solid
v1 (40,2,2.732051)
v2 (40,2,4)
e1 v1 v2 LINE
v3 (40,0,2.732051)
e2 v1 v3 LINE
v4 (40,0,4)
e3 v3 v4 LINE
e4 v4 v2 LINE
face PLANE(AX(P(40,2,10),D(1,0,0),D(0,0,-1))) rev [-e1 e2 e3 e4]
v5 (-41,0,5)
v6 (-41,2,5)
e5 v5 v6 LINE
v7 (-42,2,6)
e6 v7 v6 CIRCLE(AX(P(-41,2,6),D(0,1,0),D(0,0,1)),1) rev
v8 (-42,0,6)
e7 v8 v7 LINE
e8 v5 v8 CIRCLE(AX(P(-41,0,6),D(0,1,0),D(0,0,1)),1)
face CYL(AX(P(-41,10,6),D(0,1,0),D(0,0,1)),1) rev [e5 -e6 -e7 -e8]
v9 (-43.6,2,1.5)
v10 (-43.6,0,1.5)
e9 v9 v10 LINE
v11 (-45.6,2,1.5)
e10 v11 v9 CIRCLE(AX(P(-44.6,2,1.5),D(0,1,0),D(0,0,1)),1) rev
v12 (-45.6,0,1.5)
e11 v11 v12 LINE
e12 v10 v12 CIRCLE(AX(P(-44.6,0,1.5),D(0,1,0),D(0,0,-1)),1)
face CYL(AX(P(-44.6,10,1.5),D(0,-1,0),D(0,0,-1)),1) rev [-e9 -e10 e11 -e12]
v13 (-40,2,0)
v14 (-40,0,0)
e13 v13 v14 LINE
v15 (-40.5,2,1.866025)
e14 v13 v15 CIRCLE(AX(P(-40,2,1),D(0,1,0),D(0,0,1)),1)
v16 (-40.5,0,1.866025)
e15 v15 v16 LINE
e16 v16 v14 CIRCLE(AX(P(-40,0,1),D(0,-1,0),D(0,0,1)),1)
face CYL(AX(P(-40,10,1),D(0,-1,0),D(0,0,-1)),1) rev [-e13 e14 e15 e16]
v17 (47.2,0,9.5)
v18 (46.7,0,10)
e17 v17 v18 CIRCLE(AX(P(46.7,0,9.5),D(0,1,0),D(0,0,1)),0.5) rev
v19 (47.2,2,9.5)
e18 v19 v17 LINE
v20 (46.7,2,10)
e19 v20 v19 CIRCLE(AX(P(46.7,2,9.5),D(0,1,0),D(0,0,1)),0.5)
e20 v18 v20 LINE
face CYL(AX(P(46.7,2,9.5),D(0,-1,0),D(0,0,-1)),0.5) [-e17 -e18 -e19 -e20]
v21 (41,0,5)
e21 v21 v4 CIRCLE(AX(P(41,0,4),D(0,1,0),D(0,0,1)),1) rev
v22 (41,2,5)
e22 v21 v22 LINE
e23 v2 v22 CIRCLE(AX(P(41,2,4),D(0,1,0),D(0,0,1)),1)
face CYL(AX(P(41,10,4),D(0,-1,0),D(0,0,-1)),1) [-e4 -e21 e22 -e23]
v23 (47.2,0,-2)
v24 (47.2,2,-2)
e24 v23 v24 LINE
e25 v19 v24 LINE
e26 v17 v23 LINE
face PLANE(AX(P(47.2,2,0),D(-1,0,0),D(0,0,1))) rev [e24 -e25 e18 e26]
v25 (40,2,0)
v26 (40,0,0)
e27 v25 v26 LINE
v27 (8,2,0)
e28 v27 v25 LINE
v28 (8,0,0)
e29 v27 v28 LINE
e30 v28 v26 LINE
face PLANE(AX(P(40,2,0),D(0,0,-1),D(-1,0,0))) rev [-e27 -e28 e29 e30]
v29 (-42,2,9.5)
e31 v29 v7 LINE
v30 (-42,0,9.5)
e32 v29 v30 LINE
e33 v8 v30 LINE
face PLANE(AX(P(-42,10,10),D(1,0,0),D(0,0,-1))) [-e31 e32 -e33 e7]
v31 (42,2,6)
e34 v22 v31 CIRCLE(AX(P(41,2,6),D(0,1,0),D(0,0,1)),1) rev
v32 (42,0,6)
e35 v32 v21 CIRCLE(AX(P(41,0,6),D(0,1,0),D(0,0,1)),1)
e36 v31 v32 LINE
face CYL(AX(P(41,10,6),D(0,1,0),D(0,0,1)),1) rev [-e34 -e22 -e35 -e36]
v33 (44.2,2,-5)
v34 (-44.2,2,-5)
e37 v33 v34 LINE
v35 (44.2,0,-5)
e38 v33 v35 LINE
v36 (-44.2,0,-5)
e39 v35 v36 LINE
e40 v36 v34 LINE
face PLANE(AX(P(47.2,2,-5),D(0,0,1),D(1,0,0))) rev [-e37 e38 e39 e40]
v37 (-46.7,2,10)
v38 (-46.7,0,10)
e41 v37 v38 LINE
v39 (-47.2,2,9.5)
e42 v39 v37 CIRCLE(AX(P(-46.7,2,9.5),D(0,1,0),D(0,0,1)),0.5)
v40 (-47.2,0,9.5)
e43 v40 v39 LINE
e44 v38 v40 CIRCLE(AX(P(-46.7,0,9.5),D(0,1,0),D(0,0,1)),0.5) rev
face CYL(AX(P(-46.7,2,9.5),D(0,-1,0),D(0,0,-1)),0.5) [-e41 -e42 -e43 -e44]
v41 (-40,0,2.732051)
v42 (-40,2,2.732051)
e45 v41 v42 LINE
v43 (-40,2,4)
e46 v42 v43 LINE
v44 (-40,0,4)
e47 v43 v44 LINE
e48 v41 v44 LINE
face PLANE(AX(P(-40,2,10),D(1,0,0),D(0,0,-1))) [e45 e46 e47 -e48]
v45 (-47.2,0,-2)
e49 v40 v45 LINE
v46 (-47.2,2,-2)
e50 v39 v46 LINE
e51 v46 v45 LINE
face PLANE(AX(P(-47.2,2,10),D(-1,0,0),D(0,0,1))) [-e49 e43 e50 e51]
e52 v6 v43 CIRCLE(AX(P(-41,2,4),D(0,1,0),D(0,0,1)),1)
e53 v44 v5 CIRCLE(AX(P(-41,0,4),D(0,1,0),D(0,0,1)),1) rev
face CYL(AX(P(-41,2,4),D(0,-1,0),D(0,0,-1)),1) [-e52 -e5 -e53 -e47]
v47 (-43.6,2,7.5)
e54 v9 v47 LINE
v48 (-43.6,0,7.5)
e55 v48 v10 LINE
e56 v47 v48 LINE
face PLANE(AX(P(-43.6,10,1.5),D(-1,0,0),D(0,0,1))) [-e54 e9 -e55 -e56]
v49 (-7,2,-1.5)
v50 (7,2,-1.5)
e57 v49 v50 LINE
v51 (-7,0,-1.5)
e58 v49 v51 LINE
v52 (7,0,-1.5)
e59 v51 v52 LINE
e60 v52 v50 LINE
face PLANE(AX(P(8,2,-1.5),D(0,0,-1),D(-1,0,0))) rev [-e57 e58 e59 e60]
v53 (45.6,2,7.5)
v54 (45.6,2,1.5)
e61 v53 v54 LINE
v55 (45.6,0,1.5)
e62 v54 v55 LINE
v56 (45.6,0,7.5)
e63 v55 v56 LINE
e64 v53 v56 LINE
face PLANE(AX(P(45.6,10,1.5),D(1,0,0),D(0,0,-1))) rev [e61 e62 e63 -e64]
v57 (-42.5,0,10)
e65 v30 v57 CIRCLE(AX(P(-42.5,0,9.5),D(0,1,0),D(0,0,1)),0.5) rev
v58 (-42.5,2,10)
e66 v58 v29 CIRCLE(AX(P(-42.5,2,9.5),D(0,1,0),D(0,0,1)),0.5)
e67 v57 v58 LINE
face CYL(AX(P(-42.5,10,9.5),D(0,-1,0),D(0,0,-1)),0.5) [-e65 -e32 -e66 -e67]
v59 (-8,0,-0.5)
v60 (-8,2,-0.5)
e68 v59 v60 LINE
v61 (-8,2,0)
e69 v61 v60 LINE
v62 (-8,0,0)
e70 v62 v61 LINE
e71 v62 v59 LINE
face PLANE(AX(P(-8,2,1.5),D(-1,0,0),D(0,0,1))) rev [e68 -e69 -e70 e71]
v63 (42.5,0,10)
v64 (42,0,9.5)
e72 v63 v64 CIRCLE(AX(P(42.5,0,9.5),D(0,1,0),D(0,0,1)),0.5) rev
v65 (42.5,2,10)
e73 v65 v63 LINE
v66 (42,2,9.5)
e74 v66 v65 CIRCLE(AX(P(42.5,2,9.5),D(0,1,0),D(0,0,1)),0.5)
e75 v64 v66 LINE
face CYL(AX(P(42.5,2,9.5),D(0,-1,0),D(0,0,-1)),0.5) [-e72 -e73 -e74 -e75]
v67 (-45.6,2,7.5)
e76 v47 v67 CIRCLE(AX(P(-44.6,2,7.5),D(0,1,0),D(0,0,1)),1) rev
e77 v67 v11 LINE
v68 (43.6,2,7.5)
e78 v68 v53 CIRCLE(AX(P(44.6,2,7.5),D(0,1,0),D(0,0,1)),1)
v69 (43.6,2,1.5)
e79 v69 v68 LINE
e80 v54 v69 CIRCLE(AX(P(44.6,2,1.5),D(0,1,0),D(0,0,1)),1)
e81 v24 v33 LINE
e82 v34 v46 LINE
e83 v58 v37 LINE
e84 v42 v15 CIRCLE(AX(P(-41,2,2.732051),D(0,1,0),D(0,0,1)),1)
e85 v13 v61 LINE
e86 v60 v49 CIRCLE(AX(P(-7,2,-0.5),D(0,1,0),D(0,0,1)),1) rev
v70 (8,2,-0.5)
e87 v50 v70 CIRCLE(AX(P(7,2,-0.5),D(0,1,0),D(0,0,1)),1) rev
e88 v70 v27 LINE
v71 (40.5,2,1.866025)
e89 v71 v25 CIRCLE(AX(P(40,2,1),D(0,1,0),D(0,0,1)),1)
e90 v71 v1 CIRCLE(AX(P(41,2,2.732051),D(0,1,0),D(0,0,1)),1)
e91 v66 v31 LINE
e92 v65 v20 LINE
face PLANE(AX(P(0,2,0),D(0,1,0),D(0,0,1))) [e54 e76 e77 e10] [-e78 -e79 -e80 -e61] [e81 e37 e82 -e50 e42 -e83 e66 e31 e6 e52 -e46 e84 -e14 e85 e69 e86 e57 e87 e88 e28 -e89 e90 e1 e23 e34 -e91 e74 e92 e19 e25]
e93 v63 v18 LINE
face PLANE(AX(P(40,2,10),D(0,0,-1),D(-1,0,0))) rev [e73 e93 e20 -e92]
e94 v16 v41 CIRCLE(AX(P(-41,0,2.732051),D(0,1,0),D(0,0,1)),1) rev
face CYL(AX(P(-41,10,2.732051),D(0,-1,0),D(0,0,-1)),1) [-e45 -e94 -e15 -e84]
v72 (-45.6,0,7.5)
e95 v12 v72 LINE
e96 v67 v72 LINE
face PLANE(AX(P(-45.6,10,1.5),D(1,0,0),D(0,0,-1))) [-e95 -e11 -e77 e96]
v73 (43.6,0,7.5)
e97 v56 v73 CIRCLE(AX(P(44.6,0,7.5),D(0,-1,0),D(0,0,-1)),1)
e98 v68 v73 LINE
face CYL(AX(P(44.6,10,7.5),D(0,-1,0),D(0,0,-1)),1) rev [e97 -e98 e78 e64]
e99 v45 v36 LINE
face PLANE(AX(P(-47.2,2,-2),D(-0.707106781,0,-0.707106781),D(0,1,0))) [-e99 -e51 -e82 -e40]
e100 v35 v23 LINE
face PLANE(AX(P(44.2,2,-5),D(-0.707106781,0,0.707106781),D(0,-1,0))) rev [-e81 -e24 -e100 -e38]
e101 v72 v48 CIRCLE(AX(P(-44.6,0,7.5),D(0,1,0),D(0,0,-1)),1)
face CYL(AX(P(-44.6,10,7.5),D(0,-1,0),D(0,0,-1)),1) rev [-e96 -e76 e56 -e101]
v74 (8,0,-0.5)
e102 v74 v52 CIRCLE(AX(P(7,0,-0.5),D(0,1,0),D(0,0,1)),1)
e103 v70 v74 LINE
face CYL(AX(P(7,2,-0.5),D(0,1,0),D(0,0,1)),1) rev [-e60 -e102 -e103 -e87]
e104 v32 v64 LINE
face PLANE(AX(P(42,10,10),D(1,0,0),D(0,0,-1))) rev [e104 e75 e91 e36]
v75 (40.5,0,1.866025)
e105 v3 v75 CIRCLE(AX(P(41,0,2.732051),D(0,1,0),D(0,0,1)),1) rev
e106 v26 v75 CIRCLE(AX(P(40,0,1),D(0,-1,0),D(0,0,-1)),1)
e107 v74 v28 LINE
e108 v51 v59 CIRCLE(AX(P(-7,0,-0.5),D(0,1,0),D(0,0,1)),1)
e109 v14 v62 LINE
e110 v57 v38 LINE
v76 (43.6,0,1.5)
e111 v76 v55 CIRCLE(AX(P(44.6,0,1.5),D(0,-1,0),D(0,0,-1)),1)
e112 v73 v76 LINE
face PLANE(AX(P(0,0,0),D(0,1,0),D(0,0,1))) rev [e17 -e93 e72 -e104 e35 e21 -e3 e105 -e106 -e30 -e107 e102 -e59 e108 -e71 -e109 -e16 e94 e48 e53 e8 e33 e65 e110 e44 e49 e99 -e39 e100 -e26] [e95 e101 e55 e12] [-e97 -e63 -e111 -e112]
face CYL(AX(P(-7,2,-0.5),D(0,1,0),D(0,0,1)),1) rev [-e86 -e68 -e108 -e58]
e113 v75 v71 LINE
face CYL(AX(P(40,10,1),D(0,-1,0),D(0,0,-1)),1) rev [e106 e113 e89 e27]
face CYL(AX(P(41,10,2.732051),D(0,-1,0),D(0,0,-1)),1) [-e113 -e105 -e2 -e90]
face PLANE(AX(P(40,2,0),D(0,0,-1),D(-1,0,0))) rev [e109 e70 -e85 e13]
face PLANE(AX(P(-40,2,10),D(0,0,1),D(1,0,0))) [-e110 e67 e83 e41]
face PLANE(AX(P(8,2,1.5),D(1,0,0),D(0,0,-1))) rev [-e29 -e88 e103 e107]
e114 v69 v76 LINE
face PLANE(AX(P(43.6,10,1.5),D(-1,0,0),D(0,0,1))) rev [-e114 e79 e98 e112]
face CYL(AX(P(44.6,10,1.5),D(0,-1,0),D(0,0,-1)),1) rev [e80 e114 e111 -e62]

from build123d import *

# Parameters (mm, degrees)
EXTRUDE_1_DEPTH     = 2
SKETCH_3_W          = 2
SKETCH_3_H          = 5
CUT_EXTRUDE_2_DEPTH = 10
CHAMFER_1_SIZE      = 3
SKETCH_4_W          = 16
SKETCH_4_H          = 3
CUT_EXTRUDE_3_DEPTH = 2
FILLET_1_R          = 1
FILLET_START        = -1
FILLET_2_DEPTH      = 4
FILLET_2_2_DEPTH    = 2
FILLET_3_R          = 0.5
CUT_EXTRUDE_4_DEPTH = 10
SKETCH_7_R          = 1
CUT_EXTRUDE_6_DEPTH = 10
FILLET_5_R          = 1


with BuildPart() as part:
    # 草图1 → 凸台-拉伸1 (new body)
    with BuildSketch(Plane(origin=(0, 0, 0), x_dir=(1, 0, 0), z_dir=(0, 1, 0))):
        Polygon((40, -10), (40, 0), (0, 0), (0, 5), (47.2, 5), (47.2, 0), (47.2, -10), align=None)
    extrude_1 = extrude(amount=EXTRUDE_1_DEPTH)

    # 草图3 → 切除-拉伸2 (cut)
    with BuildSketch(Plane.XZ):
        with Locations((41, 7.5)):
            Rectangle(SKETCH_3_W, SKETCH_3_H)
    cut_extrude_2 = extrude(amount=-CUT_EXTRUDE_2_DEPTH, mode=Mode.SUBTRACT)

    # 镜向1: 凸台-拉伸1, 切除-拉伸2 across plane
    add(extrude_1.mirror(Plane(origin=(0, 0, 0), x_dir=(0, 0, 1), z_dir=(1, 0, 0))))
    add(cut_extrude_2.mirror(Plane(origin=(0, 0, 0), x_dir=(0, 0, 1), z_dir=(1, 0, 0))), mode=Mode.SUBTRACT)

    # 倒角1
    chamfer_1_edges = [part.edges().sort_by_distance(p)[0] for p in [
        (47.2, 1, -5),
        (-47.2, 1, -5),
    ]]
    chamfer(chamfer_1_edges, length=CHAMFER_1_SIZE)

    # 草图4 → 切除-拉伸3 (cut)
    with BuildSketch(Plane.XZ):
        Rectangle(SKETCH_4_W, SKETCH_4_H)
    extrude(amount=-CUT_EXTRUDE_3_DEPTH, mode=Mode.SUBTRACT)

    # 圆角1
    fillet_1_edges = [part.edges().sort_by_distance(p)[0] for p in [
        (-8, 1, -1.5),
        (8, 1, -1.5),
    ]]
    fillet(fillet_1_edges, radius=FILLET_1_R)

    # 圆角2: read off the stored shape, not the designer's step
    # 圆角2 outline → 圆角2 (cut)
    with BuildSketch(Plane(origin=(0, 0, 0), x_dir=(1, 0, 0), z_dir=(0, 1, 0)).offset(FILLET_START)):
        with BuildLine():
            Line((-40, -5), (-40, -4))
            ThreePointArc((-40, -4), (-40.292893219, -4.707106781), (-41, -5))
            Line((-41, -5), (-40, -5))
        make_face()
        with BuildLine():
            Line((40, -5), (41, -5))
            ThreePointArc((41, -5), (40.292893219, -4.707106781), (40, -4))
            Line((40, -4), (40, -5))
        make_face()
    extrude(amount=FILLET_2_DEPTH, mode=Mode.SUBTRACT)

    # Fillet 2 2 outline → Fillet 2 2 (add)
    with BuildSketch(Plane(origin=(0, 0, 0), x_dir=(1, 0, 0), z_dir=(0, 1, 0))):
        with BuildLine():
            ThreePointArc((-42, -6), (-41.707106781, -5.292893219), (-41, -5))
            Line((-41, -5), (-42, -5))
            Line((-42, -5), (-42, -6))
        make_face()
        with BuildLine():
            ThreePointArc((41, -5), (41.707106781, -5.292893219), (42, -6))
            Line((42, -6), (42, -5))
            Line((42, -5), (41, -5))
        make_face()
    extrude(amount=FILLET_2_2_DEPTH)

    # 圆角3
    fillet_3_edges = [part.edges().sort_by_distance(p)[0] for p in [
        (47.2, 1, 10),
        (42, 1, 10),
        (-47.2, 1, 10),
        (-42, 1, 10),
    ]]
    fillet(fillet_3_edges, radius=FILLET_3_R)

    # 草图5 → 切除-拉伸4 (cut)
    with BuildSketch(Plane.XZ):
        with BuildLine():
            Line((43.6, 1.5), (43.6, 7.5))
            ThreePointArc((43.6, 7.5), (44.6, 8.5), (45.6, 7.5))
            Line((45.6, 7.5), (45.6, 1.5))
            ThreePointArc((45.6, 1.5), (44.6, 0.5), (43.6, 1.5))
        make_face()
    cut_extrude_4 = extrude(amount=-CUT_EXTRUDE_4_DEPTH, mode=Mode.SUBTRACT)

    # 镜向2: 切除-拉伸4 across plane
    add(cut_extrude_4.mirror(Plane(origin=(0, 0, 0), x_dir=(0, 0, 1), z_dir=(1, 0, 0))), mode=Mode.SUBTRACT)

    # 草图7 → 切除-拉伸6 (cut)
    with BuildSketch(Plane.XZ):
        with Locations((40, 1)):
            Circle(SKETCH_7_R)
        with Locations((-40, 1)):
            Circle(SKETCH_7_R)
    extrude(amount=-CUT_EXTRUDE_6_DEPTH, mode=Mode.SUBTRACT)

    # 圆角5
    fillet_5_edges = [part.edges().sort_by_distance(p)[0] for p in [
        (40, 1, 2),
        (-40, 1, 2),
    ]]
    fillet(fillet_5_edges, radius=FILLET_5_R)


solid = part.part
